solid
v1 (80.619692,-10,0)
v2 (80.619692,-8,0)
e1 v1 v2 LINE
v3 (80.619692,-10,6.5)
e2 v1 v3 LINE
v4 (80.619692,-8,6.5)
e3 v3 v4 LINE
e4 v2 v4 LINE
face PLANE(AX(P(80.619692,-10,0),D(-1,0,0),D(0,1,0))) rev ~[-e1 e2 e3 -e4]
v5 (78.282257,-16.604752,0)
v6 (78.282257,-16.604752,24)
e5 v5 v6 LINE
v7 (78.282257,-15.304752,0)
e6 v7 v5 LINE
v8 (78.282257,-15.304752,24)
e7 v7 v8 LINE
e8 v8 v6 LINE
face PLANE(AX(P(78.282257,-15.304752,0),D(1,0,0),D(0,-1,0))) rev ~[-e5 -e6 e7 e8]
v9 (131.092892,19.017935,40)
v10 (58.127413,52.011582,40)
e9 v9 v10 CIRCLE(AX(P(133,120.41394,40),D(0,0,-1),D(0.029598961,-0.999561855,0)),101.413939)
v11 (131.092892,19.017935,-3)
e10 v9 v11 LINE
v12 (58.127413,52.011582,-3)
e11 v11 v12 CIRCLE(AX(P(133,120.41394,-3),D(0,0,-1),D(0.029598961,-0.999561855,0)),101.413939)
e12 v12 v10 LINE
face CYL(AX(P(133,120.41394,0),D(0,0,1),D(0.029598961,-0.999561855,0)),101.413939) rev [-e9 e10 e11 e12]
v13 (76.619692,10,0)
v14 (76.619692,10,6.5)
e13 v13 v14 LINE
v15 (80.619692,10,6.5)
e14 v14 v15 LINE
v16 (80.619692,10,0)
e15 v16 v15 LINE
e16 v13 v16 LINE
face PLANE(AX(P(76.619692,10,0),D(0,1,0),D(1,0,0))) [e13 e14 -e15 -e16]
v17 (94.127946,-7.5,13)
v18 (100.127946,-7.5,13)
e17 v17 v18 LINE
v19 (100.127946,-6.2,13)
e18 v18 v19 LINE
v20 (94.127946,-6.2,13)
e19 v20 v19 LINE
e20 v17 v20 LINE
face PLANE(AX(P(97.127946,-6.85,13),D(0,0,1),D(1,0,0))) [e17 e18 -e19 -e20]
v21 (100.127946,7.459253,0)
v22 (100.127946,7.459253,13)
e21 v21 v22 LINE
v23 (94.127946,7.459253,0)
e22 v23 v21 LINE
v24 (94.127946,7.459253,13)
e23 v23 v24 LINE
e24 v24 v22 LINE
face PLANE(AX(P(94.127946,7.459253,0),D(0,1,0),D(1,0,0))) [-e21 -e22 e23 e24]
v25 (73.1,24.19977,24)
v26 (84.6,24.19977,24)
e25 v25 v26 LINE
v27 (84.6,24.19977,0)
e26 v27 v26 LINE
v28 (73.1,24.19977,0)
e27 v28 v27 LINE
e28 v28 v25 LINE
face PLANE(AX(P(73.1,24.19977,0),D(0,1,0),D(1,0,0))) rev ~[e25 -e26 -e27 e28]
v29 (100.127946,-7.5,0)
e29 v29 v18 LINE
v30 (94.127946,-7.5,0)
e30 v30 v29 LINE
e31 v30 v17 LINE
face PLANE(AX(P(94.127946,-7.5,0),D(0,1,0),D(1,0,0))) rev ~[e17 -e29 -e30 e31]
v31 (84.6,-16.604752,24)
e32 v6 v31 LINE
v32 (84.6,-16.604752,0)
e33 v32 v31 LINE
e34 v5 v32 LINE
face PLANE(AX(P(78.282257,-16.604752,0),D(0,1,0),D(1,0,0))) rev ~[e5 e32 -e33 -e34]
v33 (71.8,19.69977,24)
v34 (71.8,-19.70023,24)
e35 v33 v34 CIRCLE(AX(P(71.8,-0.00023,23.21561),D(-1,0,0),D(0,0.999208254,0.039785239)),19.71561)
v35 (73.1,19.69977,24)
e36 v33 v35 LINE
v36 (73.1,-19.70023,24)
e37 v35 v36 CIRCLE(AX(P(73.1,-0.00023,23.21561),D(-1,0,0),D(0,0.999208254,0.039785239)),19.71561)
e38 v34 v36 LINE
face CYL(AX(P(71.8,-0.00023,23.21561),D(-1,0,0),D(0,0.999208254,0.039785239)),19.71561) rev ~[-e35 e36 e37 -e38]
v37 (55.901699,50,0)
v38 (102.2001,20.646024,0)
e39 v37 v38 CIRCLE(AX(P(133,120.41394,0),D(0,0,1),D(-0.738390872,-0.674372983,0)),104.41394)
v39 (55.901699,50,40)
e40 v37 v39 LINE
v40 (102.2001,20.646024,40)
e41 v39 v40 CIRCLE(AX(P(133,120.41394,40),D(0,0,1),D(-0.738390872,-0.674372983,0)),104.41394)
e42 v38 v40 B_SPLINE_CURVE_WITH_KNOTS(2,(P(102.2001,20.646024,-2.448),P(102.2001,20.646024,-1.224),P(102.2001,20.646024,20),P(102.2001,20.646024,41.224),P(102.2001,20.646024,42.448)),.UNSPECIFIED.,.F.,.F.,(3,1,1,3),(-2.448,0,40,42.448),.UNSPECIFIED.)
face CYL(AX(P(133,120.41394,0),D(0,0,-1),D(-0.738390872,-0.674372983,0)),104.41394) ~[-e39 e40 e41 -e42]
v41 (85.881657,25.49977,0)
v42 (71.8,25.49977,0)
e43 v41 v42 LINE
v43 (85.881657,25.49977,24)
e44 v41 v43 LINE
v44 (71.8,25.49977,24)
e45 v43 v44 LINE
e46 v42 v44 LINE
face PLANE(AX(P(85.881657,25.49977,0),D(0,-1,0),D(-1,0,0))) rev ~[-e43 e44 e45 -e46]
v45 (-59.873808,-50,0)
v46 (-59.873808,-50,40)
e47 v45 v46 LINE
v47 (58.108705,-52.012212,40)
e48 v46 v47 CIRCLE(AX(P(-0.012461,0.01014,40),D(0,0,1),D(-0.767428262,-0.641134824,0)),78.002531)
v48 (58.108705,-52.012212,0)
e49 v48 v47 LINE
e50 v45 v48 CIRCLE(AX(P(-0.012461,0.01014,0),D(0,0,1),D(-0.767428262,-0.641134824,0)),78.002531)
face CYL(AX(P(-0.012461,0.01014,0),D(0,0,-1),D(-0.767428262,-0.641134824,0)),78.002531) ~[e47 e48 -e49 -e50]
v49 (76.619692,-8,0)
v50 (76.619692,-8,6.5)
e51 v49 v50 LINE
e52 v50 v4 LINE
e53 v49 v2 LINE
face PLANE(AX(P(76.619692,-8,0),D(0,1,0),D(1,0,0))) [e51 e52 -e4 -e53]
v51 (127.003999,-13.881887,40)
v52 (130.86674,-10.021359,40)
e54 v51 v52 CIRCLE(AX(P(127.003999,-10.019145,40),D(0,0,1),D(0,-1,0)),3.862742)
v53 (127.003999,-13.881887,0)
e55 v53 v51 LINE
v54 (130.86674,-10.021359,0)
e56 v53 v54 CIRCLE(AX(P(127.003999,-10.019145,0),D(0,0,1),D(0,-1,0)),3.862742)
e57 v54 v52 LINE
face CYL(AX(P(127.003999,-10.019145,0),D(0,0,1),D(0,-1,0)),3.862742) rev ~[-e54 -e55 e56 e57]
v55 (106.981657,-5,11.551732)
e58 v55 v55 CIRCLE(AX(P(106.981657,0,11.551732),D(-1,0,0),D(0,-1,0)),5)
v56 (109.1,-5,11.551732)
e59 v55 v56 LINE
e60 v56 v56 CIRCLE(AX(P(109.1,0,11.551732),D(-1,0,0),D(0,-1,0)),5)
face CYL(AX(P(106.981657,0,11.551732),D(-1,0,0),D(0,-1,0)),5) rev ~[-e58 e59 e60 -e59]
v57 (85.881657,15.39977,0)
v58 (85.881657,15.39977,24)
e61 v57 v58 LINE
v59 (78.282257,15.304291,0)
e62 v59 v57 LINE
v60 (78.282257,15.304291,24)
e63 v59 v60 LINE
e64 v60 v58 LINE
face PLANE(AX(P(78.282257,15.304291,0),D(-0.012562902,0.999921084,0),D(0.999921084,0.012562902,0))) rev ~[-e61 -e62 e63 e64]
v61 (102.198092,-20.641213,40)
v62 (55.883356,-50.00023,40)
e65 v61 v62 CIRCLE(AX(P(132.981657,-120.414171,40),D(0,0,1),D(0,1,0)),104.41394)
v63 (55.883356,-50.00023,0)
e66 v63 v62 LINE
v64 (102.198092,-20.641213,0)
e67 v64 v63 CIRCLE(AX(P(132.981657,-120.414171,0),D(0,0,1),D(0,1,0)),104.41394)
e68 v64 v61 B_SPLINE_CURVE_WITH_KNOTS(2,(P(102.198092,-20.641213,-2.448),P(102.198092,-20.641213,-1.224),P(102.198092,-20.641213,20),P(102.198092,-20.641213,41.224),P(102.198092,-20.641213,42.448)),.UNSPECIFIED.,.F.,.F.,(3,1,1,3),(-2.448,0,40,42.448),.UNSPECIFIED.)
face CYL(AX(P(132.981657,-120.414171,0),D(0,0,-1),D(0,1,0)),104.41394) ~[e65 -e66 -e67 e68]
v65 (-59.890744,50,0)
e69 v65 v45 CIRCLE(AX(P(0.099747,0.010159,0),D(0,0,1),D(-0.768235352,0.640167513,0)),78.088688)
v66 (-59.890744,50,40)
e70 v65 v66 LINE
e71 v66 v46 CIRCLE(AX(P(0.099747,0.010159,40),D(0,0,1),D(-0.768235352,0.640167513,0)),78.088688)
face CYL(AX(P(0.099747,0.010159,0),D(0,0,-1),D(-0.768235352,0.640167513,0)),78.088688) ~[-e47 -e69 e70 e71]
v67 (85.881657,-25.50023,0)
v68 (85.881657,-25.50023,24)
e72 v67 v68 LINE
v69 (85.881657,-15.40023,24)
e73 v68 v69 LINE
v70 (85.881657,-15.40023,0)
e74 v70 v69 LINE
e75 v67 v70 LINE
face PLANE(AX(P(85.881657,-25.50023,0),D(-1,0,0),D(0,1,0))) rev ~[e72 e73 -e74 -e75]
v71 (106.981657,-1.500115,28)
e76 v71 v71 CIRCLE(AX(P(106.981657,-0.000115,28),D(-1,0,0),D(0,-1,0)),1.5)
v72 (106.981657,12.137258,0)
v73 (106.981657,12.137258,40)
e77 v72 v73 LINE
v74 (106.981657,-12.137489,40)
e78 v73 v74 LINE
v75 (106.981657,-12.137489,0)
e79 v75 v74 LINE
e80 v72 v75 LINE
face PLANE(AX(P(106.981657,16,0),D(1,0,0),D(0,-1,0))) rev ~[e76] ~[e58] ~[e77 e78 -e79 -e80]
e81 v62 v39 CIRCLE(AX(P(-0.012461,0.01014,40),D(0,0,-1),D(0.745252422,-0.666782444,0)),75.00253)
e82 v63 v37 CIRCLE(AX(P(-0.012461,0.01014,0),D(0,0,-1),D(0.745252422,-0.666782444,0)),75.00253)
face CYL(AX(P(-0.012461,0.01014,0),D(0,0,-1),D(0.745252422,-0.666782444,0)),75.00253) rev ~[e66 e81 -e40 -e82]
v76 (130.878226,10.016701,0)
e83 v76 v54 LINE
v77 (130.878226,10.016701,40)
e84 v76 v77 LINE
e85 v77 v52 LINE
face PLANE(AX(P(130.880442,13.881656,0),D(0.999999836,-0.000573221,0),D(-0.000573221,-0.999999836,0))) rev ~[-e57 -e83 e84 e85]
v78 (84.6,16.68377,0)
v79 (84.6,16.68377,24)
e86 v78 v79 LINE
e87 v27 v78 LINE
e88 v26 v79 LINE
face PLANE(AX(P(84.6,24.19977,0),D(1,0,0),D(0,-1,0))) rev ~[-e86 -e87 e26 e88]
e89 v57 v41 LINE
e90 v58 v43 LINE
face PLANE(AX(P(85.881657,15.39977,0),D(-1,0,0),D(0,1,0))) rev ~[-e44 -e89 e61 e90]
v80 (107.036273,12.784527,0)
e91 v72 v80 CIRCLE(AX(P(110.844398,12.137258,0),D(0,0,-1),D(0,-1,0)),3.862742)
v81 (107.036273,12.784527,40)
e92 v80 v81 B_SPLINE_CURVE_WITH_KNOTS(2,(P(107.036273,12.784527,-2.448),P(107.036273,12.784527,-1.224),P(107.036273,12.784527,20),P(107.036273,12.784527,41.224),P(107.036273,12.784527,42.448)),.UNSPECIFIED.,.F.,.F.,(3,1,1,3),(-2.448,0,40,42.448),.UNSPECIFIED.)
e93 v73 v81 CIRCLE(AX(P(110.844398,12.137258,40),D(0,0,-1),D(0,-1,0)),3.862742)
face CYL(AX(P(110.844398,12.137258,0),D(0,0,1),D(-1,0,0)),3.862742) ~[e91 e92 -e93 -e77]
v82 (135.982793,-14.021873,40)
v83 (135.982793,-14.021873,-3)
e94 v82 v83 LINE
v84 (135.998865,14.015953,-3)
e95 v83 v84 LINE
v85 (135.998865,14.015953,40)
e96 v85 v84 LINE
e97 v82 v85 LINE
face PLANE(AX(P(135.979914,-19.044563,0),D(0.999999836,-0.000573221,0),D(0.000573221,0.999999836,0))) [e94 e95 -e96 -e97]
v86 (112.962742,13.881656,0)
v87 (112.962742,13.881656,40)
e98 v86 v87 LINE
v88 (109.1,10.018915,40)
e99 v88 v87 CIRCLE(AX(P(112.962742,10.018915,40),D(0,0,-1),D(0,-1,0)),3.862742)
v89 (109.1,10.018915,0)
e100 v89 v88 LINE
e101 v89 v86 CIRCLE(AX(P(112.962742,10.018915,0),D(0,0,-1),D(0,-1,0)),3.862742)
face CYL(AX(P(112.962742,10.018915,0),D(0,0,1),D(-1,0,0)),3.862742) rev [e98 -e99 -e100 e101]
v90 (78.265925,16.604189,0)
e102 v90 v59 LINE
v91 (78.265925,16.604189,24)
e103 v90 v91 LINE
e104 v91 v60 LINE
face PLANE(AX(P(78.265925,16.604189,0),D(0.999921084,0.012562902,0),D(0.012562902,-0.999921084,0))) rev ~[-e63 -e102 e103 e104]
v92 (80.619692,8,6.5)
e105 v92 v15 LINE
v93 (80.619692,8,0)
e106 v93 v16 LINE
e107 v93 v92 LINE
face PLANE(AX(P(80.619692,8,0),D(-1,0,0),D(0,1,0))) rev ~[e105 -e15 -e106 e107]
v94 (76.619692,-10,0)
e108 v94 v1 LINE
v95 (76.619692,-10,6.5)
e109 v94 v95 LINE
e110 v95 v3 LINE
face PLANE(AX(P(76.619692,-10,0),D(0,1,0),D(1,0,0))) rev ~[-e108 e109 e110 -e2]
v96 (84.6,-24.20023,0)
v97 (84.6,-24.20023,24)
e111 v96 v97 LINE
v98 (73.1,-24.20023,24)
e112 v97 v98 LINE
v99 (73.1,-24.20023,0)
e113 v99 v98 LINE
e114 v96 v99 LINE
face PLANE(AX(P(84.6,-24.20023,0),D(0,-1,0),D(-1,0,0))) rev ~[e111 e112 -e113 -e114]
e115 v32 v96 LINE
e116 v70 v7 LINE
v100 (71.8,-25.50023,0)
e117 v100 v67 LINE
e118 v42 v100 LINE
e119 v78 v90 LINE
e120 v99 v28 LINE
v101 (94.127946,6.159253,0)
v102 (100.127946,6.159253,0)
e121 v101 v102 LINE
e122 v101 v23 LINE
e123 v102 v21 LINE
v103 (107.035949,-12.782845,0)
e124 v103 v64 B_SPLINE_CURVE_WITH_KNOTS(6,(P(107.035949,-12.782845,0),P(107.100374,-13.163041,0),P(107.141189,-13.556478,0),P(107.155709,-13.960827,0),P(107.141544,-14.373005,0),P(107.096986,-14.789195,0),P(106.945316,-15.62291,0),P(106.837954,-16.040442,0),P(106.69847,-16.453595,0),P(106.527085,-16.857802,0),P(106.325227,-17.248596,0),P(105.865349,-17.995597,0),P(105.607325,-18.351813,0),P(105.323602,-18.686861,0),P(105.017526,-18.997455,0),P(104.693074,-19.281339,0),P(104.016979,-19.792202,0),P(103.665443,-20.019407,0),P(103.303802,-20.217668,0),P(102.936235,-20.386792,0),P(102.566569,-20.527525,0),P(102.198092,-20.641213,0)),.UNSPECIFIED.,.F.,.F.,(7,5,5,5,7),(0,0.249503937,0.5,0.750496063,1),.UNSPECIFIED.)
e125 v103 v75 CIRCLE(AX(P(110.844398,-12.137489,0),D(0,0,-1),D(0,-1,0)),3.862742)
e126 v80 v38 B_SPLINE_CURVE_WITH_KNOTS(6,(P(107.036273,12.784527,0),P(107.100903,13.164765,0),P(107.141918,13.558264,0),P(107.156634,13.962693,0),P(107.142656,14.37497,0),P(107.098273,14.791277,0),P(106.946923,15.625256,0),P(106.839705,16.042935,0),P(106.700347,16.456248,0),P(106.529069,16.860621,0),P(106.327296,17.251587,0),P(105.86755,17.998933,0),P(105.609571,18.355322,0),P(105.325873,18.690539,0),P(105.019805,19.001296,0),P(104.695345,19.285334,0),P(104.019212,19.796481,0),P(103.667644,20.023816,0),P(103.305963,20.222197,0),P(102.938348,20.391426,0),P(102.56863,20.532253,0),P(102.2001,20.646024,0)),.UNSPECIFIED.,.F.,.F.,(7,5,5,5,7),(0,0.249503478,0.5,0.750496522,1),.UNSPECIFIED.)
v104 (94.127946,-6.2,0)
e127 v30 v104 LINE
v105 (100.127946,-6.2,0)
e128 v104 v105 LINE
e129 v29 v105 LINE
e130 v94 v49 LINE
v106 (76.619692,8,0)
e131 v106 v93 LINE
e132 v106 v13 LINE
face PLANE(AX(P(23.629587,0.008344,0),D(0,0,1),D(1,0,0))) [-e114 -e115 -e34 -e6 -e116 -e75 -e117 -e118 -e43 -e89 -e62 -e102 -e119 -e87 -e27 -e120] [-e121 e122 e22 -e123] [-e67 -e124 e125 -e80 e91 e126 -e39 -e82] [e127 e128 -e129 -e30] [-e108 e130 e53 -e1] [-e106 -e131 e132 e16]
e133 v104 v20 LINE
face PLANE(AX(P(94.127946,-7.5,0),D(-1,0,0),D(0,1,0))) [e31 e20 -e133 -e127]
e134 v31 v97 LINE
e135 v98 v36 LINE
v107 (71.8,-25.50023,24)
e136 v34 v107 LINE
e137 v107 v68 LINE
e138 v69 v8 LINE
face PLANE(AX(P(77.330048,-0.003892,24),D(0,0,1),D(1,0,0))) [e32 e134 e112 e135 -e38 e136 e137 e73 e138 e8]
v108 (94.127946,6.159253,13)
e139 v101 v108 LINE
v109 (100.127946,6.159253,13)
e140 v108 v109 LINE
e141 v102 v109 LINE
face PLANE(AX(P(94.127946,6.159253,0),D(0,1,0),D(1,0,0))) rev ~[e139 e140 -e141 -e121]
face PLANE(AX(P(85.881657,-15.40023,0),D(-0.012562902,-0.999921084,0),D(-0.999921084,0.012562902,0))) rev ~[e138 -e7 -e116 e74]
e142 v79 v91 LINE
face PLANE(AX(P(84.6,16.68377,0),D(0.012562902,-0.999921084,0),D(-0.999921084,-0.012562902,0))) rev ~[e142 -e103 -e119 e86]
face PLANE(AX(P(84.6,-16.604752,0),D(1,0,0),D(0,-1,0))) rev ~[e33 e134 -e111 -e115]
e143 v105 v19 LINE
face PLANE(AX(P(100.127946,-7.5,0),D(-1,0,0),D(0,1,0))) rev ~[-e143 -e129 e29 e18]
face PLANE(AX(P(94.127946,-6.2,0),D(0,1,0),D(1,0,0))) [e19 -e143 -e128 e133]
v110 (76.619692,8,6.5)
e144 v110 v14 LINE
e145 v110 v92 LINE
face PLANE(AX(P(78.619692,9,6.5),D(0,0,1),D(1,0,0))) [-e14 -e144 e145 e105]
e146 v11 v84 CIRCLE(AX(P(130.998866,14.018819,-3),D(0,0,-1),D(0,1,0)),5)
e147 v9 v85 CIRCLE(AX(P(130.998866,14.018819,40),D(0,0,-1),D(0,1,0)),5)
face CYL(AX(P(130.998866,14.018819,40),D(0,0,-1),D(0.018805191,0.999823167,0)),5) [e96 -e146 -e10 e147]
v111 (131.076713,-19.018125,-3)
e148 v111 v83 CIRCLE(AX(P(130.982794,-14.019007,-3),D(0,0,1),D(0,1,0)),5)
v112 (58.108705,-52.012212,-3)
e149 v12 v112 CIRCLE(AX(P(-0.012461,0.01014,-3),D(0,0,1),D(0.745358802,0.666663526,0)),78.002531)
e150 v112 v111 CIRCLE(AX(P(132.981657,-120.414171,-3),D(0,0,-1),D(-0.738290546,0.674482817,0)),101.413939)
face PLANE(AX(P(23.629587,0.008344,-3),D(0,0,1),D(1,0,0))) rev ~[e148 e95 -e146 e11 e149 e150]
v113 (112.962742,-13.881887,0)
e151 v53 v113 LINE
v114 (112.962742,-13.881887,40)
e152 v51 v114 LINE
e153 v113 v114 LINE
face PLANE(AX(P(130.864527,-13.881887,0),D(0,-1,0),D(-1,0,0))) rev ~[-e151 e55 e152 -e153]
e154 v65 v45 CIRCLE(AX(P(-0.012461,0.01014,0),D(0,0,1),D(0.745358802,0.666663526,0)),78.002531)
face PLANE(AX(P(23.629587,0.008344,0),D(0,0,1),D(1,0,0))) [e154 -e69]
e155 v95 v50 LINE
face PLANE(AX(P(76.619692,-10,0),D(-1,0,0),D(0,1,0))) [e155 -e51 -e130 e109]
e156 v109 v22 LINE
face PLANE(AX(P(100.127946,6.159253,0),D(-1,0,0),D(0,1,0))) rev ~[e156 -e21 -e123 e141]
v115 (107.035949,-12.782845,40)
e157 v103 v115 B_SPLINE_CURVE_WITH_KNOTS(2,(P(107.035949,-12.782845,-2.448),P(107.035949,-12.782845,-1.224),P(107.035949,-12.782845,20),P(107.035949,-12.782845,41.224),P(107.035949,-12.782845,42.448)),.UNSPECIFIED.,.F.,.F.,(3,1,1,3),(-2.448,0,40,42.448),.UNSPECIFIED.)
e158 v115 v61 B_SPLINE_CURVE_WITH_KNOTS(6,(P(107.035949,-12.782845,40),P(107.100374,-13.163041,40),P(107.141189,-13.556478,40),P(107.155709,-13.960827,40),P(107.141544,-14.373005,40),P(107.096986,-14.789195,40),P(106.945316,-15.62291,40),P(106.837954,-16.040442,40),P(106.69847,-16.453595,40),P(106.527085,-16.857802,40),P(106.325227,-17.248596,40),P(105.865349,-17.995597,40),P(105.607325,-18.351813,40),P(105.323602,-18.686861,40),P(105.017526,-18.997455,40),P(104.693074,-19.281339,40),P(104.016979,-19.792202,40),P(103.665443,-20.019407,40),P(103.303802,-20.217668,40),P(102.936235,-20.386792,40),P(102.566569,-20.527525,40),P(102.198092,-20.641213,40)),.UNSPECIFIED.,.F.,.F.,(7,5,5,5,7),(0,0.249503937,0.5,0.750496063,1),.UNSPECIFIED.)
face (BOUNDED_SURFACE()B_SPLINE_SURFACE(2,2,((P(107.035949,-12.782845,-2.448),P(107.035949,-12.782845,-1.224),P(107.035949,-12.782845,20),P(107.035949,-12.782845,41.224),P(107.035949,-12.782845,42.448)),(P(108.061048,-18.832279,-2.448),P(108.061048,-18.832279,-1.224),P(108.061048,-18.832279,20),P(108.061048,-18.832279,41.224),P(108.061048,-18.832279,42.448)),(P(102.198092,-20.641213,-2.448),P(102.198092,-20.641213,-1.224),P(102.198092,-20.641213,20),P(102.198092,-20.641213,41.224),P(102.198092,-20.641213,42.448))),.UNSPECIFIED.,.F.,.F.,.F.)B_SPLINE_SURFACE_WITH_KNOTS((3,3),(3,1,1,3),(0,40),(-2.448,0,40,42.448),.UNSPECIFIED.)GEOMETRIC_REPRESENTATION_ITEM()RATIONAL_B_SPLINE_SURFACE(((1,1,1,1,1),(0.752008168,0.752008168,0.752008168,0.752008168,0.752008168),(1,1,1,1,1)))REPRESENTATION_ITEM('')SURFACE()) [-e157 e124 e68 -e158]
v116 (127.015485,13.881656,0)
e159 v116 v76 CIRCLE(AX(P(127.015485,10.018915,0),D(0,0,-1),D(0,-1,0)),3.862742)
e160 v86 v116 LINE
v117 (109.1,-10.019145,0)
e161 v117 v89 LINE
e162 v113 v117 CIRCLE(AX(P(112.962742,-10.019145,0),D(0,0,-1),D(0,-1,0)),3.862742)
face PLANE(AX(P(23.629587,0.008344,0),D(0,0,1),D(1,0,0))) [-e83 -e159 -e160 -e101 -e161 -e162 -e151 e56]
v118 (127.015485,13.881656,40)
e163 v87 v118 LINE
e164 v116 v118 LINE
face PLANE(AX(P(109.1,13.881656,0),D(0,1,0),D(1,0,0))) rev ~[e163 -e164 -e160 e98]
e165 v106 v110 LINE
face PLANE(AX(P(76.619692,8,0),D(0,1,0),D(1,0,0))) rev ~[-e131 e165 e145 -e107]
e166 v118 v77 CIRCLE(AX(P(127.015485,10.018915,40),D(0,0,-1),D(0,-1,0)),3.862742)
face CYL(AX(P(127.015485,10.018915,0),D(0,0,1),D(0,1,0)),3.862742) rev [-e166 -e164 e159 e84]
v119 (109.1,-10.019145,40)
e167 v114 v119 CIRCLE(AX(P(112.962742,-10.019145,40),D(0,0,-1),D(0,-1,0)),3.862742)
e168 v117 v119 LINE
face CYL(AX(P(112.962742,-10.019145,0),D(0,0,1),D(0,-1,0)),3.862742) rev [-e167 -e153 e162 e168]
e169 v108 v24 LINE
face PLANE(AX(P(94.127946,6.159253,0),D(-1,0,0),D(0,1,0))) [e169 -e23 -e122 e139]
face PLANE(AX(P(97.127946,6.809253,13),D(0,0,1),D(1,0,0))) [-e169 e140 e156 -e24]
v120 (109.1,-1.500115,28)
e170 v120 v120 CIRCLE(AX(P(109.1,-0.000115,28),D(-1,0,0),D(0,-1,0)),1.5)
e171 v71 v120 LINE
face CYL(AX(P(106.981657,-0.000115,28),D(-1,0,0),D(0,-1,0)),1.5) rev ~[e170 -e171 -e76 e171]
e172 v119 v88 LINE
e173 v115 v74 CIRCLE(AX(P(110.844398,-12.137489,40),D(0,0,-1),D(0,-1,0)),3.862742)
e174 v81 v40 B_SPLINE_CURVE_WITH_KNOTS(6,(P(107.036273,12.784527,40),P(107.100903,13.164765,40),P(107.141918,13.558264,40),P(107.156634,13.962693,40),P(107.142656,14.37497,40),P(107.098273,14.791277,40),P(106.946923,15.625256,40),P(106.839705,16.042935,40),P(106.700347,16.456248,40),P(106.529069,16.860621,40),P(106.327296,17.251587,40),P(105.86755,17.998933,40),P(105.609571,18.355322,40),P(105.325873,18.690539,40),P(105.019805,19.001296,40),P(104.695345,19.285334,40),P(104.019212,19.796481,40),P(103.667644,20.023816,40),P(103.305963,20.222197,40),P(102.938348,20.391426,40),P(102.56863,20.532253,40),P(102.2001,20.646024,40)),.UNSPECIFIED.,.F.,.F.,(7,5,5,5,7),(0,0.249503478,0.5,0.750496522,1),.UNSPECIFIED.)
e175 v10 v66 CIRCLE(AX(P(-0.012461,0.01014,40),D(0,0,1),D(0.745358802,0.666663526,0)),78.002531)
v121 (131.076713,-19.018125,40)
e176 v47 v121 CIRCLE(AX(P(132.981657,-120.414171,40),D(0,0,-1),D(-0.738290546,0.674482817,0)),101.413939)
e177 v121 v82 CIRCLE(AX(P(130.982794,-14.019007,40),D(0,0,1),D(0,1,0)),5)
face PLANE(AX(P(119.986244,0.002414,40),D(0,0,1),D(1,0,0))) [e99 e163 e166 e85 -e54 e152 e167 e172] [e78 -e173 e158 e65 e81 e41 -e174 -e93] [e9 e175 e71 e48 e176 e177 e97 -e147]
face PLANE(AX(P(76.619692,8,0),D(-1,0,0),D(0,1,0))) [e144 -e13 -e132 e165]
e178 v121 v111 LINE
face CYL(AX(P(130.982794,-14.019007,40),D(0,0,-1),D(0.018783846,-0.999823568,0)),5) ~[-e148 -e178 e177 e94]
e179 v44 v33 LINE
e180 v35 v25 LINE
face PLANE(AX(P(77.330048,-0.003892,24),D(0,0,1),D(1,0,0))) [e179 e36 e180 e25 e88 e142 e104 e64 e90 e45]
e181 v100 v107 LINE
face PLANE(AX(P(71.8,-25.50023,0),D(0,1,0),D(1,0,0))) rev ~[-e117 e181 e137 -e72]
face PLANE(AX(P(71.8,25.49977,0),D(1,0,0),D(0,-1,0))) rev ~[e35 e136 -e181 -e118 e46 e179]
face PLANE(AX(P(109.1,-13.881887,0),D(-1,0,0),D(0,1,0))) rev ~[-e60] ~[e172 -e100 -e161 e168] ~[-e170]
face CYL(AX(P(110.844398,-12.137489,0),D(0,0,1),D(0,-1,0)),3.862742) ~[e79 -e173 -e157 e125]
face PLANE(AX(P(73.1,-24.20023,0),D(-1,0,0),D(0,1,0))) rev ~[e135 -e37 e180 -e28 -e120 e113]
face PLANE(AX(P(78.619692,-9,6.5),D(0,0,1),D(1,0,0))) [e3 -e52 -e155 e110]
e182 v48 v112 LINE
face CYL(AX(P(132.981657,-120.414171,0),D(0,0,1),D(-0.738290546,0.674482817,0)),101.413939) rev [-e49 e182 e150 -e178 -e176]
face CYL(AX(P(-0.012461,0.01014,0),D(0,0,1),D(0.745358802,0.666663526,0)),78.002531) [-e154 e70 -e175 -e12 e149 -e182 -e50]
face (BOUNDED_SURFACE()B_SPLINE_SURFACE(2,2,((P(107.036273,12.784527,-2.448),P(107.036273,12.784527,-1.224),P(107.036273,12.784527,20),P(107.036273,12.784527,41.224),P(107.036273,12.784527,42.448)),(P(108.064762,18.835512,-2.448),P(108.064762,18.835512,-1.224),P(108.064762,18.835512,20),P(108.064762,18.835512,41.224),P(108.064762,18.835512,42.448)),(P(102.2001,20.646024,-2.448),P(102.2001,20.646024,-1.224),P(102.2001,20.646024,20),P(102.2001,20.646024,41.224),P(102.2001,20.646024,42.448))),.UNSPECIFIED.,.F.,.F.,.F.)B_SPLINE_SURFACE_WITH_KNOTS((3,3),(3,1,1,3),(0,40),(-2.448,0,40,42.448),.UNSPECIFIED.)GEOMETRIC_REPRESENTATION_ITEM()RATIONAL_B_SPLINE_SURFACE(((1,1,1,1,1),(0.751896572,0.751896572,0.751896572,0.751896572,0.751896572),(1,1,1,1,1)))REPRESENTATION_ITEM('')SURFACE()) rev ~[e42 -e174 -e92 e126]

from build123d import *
from build123d import SkipClean  # not in build123d's __all__

# Parameters (mm, degrees)
F1_DEPTH  = 40
F2_DEPTH  = 3
F3_DEPTH  = 24
F4_DEPTH  = 40
F6_DEPTH  = 2.5
F7_W      = 6
F7_H      = 1.3
F8_DEPTH  = 13
F9_W      = 4
F9_H      = 2
F10_DEPTH = 6.5
F11_R     = 1.5
F12_DEPTH = 3.5
F13_R     = 5
F14_DEPTH = 2.5
F15_R     = 3.8627416998
F16_R     = 7
F17_R     = 7
F18_R     = 5


# Not quite as in the source:
# - after a boolean that leaves OpenCascade's solid faulty, fix() repairs it


with BuildPart() as f1:
    # F0 (on Top) → F1 (new body)
    with BuildSketch(Plane.XY):
        with BuildLine():
            ThreePointArc((136.0017471959, 19.0444356012), (93.4644134414, 27.0237675476), (58.1274125485, 52.0115819608))
            ThreePointArc((58.1274125485, 52.0115819608), (-1.3417961939, 78.0013424722), (-59.8907435455, 49.9999995776))
            ThreePointArc((-59.8907435455, 49.9999995776), (-77.9889397002, -0.003066533), (-59.8738076097, -49.9999995776))
            ThreePointArc((-59.8738076097, -49.9999995776), (-1.3426138919, -77.9810495035), (58.1087045089, -52.0122117666))
            ThreePointArc((58.1087045089, -52.0122117666), (93.4442134492, -27.0247840784), (135.9799137778, -19.0445627716))
            Line((135.9799137778, -19.0445627716), (136.0017471959, 19.0444356012))
        make_face()
        with BuildLine():
            ThreePointArc((55.9016994375, 50), (90.8688121766, 24.8773821457), (133, 16))
            Line((133, 16), (132.9816567922, -16.0002304621))
            ThreePointArc((132.9816567922, -16.0002304621), (90.8504689689, -24.8776126078), (55.8833562297, -50.0002304621))
            ThreePointArc((55.8833562297, -50.0002304621), (-75.0149890076, 0.0238973514), (55.9016994375, 50))
        make_face(mode=Mode.SUBTRACT)
    extrude(amount=F1_DEPTH)

    # F0 (on Top) → F2 (join)
    with BuildSketch(Plane.XY):
        with BuildLine():
            ThreePointArc((136.0017471959, 19.0444356012), (93.4644134414, 27.0237675476), (58.1274125485, 52.0115819608))
            ThreePointArc((58.1274125485, 52.0115819608), (-1.3417961939, 78.0013424722), (-59.8907435455, 49.9999995776))
            ThreePointArc((-59.8907435455, 49.9999995776), (-77.9889397002, -0.003066533), (-59.8738076097, -49.9999995776))
            ThreePointArc((-59.8738076097, -49.9999995776), (-1.3426138919, -77.9810495035), (58.1087045089, -52.0122117666))
            ThreePointArc((58.1087045089, -52.0122117666), (93.4442134492, -27.0247840784), (135.9799137778, -19.0445627716))
            Line((135.9799137778, -19.0445627716), (136.0017471959, 19.0444356012))
        make_face()
        with BuildLine():
            ThreePointArc((55.9016994375, 50), (90.8688121766, 24.8773821457), (133, 16))
            Line((133, 16), (132.9816567922, -16.0002304621))
            ThreePointArc((132.9816567922, -16.0002304621), (90.8504689689, -24.8776126078), (55.8833562297, -50.0002304621))
            ThreePointArc((55.8833562297, -50.0002304621), (-75.0149890076, 0.0238973514), (55.9016994375, 50))
        make_face(mode=Mode.SUBTRACT)
        with BuildLine():
            ThreePointArc((-59.8738076097, -49.9999995776), (-77.9889397002, -0.003066533), (-59.8907435455, 49.9999995776))
            ThreePointArc((-59.8907435455, 49.9999995776), (-78.014990719, -0.003070945), (-59.8738076097, -49.9999995776))
        make_face()
        with BuildLine():
            Line((106.9816567922, 16), (133, 16))
            ThreePointArc((133, 16), (90.8688121766, 24.8773821457), (55.9016994375, 50))
            ThreePointArc((55.9016994375, 50), (-75.0149890076, 0.0238973514), (55.8833562297, -50.0002304621))
            ThreePointArc((55.8833562297, -50.0002304621), (90.8504689689, -24.8776126078), (132.9816567922, -16.0002304621))
            Line((132.9816567922, -16.0002304621), (106.9816567922, -16.0002304621))
            Line((106.9816567922, -16.0002304621), (106.9816567922, 16))
        make_face()
        Polygon((71.8, 25.4997695379), (85.881656831, 25.4997695379), (85.881656831, 15.3997695379), (78.2822565953, 15.3042914831), (78.2659248228, 16.6041888918), (84.6000000387, 16.6837695379), (84.6000000387, 24.1997695379), (73.1, 24.1997695379), (73.1, -24.2002304621), (84.6000000387, -24.2002304621), (84.6000000387, -16.6047524073), (78.2822565953, -16.6047524073), (78.2822565953, -15.3047524073), (85.881656831, -15.4002304621), (85.881656831, -25.5002304621), (71.8, -25.5002304621), align=None, mode=Mode.SUBTRACT)
        Polygon((132.9816567922, -16.0002304621), (133, 16), (106.9816567922, 16), (106.9816567922, -16.0002304621), align=None)
        Polygon((109.1000003293, -13.881886925), (109.1000003293, 13.8816564629), (130.8804418356, 13.8816564629), (130.8645271863, -13.881886925), align=None, mode=Mode.SUBTRACT)
        Polygon((130.8804418356, 13.8816564629), (109.1000003293, 13.8816564629), (109.1000003293, -13.881886925), (130.8645271863, -13.881886925), align=None)
        Polygon((85.881656831, 15.3997695379), (85.881656831, 25.4997695379), (71.8, 25.4997695379), (71.8, -25.5002304621), (85.881656831, -25.5002304621), (85.881656831, -15.4002304621), (78.2822565953, -15.3047524073), (78.2822565953, -16.6047524073), (84.6000000387, -16.6047524073), (84.6000000387, -24.2002304621), (73.1, -24.2002304621), (73.1, 24.1997695379), (84.6000000387, 24.1997695379), (84.6000000387, 16.6837695379), (78.2659248228, 16.6041888918), (78.2822565953, 15.3042914831), align=None)
    with SkipClean():  # cleaning this boolean's faces spoils the solid; the shape is the same uncleaned
        extrude(amount=-F2_DEPTH)

    # F0 (on Top) → F3 (join)
    with BuildSketch(Plane.XY):
        Polygon((85.881656831, 15.3997695379), (85.881656831, 25.4997695379), (71.8, 25.4997695379), (71.8, -25.5002304621), (85.881656831, -25.5002304621), (85.881656831, -15.4002304621), (78.2822565953, -15.3047524073), (78.2822565953, -16.6047524073), (84.6000000387, -16.6047524073), (84.6000000387, -24.2002304621), (73.1, -24.2002304621), (73.1, 24.1997695379), (84.6000000387, 24.1997695379), (84.6000000387, 16.6837695379), (78.2659248228, 16.6041888918), (78.2822565953, 15.3042914831), align=None)
    extrude(amount=F3_DEPTH)

    add(f1.part.fix(), mode=Mode.REPLACE)

    # F0 (on Top) → F4 (join)
    with BuildSketch(Plane.XY):
        Polygon((132.9816567922, -16.0002304621), (133, 16), (106.9816567922, 16), (106.9816567922, -16.0002304621), align=None)
        Polygon((109.1000003293, -13.881886925), (109.1000003293, 13.8816564629), (130.8804418356, 13.8816564629), (130.8645271863, -13.881886925), align=None, mode=Mode.SUBTRACT)
    extrude(amount=F4_DEPTH)

    # F5 (on face) → F6 (cut)
    with BuildSketch(Plane(origin=(71.8, 0, 0), x_dir=(0, -1, 0), z_dir=(-1, 0, 0))):
        with BuildLine():
            Line((19.7002304621, 24), (-19.6997695379, 24))
            ThreePointArc((-19.6997695379, 24), (0.0002304621, 3.4999999987), (19.7002304621, 24))
        make_face()
    extrude(amount=-F6_DEPTH, mode=Mode.SUBTRACT)

    # F7 (on face) → F8 (join)
    with BuildSketch(Plane.XY):
        with Locations((97.1279456019, 6.8092534184)):
            Rectangle(F7_W, F7_H)
        with Locations((97.1279456019, -6.85)):
            Rectangle(F7_W, F7_H)
    extrude(amount=F8_DEPTH)

    # F9 (on face) → F10 (join)
    with BuildSketch(Plane.XY):
        with Locations((78.6196921468, 9)):
            Rectangle(F9_W, F9_H)
        with Locations((78.6196921468, -9)):
            Rectangle(F9_W, F9_H)
    extrude(amount=F10_DEPTH)

    # F11 (on face) → F12 (cut)
    with BuildSketch(Plane(origin=(106.9816567922, 0, 0), x_dir=(0, -1, 0), z_dir=(-1, 0, 0))):
        with Locations((0.0001152311, 28)):
            Circle(F11_R)
    extrude(amount=-F12_DEPTH, mode=Mode.SUBTRACT)

    # F13 (on face) → F14 (cut)
    with BuildSketch(Plane(origin=(106.9816567922, 0, 0), x_dir=(0, -1, 0), z_dir=(-1, 0, 0))):
        with Locations((0, 11.5517321974)):
            Circle(F13_R)
    extrude(amount=-F14_DEPTH, mode=Mode.SUBTRACT)

    # F15
    f15_edges = [f1.edges().sort_by_distance(p)[0] for p in [
        (130.880442, 13.881656, 20),
        (106.981657, 16, 20),
        (109.1, 13.881656, 20),
        (130.864527, -13.881887, 20),
        (106.981657, -16.00023, 20),
        (109.1, -13.881887, 20),
    ]]
    fillet(f15_edges, radius=F15_R)

    # F16
    f16_edges = [f1.edges().sort_by_distance(p)[0] for p in [
        (132.981657, -16.00023, 20),
    ]]
    fillet(f16_edges, radius=F16_R)

    # F17
    f17_edges = [f1.edges().sort_by_distance(p)[0] for p in [
        (133, 16, 20),
    ]]
    fillet(f17_edges, radius=F17_R)

    # F18
    f18_edges = [f1.edges().sort_by_distance(p)[0] for p in [
        (135.979914, -19.044563, 18.5),
        (136.001747, 19.044436, 18.5),
    ]]
    fillet(f18_edges, radius=F18_R)


solid = f1.part
